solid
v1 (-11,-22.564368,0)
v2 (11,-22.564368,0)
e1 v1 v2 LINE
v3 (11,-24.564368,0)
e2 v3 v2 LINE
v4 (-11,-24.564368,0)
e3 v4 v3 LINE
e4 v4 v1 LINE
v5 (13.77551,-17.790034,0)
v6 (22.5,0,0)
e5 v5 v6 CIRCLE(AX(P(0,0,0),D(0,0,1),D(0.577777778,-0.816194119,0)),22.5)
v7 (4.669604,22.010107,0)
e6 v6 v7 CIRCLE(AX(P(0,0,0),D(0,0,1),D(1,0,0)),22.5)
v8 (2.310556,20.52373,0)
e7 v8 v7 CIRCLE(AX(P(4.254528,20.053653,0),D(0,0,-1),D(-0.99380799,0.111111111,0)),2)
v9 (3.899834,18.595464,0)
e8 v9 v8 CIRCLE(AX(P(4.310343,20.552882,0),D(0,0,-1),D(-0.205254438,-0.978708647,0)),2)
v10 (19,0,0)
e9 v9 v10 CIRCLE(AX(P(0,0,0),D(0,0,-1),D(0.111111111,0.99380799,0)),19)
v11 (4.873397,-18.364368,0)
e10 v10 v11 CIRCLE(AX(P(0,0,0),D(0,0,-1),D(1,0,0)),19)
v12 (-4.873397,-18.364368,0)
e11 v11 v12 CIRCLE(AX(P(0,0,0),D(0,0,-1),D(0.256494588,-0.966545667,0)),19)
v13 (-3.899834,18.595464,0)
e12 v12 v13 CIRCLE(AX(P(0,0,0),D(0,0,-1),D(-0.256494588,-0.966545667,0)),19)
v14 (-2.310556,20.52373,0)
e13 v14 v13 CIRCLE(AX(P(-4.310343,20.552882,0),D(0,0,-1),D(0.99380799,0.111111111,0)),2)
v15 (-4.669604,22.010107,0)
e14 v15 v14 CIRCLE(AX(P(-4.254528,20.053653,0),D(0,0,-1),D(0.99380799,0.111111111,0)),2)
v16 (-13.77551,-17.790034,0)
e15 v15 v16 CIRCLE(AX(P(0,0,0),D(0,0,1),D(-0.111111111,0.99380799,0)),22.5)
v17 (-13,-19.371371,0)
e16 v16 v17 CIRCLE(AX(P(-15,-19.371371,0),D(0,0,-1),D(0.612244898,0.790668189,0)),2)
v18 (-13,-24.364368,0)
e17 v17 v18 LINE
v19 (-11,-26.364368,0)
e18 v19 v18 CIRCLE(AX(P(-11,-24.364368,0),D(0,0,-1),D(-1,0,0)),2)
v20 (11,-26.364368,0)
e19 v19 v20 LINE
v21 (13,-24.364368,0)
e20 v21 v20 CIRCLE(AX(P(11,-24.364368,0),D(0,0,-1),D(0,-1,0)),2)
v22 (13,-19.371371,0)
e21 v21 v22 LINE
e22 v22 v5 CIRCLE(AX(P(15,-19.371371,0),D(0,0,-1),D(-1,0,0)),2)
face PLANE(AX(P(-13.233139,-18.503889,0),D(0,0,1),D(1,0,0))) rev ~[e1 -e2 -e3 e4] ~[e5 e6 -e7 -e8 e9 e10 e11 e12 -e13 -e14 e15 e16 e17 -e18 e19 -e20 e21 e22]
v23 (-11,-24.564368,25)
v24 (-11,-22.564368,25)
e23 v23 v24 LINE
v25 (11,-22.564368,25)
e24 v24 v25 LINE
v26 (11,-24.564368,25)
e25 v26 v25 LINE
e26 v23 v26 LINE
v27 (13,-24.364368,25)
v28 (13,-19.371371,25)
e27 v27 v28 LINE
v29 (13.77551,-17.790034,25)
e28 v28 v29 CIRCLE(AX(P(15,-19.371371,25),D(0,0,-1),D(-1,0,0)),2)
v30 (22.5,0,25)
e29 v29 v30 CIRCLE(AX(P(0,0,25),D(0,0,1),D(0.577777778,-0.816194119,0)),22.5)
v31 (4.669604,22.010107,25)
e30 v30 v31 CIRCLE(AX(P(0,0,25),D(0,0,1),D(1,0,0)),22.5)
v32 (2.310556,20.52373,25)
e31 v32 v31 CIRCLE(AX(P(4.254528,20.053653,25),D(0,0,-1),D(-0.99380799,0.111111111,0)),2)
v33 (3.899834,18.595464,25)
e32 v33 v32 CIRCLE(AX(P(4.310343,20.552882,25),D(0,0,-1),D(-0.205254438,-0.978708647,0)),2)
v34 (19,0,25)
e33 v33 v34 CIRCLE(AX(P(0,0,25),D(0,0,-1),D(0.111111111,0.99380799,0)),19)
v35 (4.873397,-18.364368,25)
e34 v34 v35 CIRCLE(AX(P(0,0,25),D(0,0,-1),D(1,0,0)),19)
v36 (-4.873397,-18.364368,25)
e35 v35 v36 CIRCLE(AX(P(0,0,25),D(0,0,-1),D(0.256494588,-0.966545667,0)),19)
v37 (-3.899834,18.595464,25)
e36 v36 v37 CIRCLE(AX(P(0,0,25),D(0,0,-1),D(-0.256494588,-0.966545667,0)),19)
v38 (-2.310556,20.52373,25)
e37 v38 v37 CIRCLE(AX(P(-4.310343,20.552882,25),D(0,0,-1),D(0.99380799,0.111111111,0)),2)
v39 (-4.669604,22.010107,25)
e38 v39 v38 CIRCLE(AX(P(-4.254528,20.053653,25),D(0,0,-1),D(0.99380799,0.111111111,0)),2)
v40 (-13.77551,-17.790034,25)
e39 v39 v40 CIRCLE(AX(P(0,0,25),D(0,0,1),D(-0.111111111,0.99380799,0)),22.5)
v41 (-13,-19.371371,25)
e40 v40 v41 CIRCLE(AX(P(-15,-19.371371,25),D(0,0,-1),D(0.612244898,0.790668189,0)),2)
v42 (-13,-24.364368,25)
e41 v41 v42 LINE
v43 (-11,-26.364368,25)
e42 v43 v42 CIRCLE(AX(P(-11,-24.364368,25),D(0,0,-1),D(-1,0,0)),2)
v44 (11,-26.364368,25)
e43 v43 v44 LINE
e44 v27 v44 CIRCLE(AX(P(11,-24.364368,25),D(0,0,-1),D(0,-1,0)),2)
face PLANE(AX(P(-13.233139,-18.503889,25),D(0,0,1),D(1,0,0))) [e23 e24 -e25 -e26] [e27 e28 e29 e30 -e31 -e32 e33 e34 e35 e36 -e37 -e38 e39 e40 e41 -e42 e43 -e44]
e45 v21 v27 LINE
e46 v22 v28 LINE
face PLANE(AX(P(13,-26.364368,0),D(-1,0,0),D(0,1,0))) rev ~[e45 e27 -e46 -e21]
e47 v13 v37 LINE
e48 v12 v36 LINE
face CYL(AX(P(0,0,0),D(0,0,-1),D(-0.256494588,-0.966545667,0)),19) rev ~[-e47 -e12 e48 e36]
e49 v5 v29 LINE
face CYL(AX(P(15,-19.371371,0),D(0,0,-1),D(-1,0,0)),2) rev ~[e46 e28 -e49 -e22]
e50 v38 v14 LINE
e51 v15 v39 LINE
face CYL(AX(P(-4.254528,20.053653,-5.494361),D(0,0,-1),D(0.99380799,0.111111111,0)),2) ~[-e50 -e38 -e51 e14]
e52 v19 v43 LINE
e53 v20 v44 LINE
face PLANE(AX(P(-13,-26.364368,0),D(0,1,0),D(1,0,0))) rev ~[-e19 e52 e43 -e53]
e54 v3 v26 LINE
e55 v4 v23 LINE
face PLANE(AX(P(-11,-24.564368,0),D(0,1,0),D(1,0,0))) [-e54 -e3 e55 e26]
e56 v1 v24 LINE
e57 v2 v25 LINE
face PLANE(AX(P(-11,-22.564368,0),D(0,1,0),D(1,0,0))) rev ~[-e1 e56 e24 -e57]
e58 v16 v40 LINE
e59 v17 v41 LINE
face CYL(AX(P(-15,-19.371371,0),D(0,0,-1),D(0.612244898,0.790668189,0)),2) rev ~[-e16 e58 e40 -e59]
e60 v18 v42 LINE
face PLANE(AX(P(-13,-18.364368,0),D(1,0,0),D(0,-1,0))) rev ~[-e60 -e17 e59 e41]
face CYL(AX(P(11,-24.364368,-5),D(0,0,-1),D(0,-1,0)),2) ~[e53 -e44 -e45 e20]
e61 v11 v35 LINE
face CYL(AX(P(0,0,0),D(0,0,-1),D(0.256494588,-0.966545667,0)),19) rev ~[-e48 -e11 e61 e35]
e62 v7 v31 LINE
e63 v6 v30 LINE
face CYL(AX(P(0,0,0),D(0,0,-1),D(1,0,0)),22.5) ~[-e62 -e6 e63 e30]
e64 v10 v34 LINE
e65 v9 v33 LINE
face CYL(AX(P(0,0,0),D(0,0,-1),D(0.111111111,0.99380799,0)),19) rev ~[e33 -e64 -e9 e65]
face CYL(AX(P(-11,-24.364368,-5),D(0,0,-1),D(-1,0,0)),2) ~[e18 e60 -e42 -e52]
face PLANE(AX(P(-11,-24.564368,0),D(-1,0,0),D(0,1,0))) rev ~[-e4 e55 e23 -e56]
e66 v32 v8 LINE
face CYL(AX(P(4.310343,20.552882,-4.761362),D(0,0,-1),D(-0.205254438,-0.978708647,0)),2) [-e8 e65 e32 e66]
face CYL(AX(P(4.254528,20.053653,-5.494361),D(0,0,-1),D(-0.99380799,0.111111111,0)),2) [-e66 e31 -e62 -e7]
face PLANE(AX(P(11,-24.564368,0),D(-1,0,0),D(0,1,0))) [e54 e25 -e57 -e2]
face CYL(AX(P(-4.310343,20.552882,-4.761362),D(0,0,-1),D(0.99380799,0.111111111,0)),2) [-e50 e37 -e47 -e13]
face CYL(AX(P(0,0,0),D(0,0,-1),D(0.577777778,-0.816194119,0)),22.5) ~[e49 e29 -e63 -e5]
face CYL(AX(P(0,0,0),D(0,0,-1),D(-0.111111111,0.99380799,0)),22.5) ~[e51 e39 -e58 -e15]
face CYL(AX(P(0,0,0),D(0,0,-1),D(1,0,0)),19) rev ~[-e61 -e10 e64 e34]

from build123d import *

# Parameters (mm, degrees)
F0_W        = 22
F0_H        = 2
F1_DEPTH    = 25
F2_T1_DEPTH = 25
F2_T3_DEPTH = 35.98872287
F2_T5_DEPTH = 34.5227248018
F2_T7_DEPTH = 35


# Not quite as in the source:
# - a fillet or chamfer that OpenCascade refuses, or shapes differently, is made with other operations: its cross-section is extruded or revolved along the edge and cut away or added


with BuildPart() as f1:
    # F0 (on Top) → F1 (new body)
    with BuildSketch(Plane.XY):
        with BuildLine():
            ThreePointArc((-4.8733971724, -18.3643676722), (-18.9479647202, 1.4052163402), (-2.1111111111, 18.88235181))
            Line((-2.1111111111, 18.88235181), (-2.5, 22.360679775))
            ThreePointArc((-2.5, 22.360679775), (-21.7874934858, 5.6173950908), (-13, -18.3643676722))
            Line((-13, -18.3643676722), (-4.8733971724, -18.3643676722))
        make_face()
        with BuildLine():
            ThreePointArc((2.1111111111, 18.88235181), (14.1617638575, 12.6666666667), (19, 0))
            ThreePointArc((19, 0), (15.0597899434, -11.5845900602), (4.8733971724, -18.3643676722))
            Line((4.8733971724, -18.3643676722), (13, -18.3643676722))
            ThreePointArc((13, -18.3643676722), (19.9843688917, -10.3380365641), (22.5, 0))
            ThreePointArc((22.5, 0), (16.7705098312, 15), (2.5, 22.360679775))
            Line((2.5, 22.360679775), (2.1111111111, 18.88235181))
        make_face()
        with BuildLine():
            Line((13, -18.3643676722), (4.8733971724, -18.3643676722))
            ThreePointArc((4.8733971724, -18.3643676722), (0, -19), (-4.8733971724, -18.3643676722))
            Line((-4.8733971724, -18.3643676722), (-13, -18.3643676722))
            ThreePointArc((-13, -18.3643676722), (0, -22.5), (13, -18.3643676722))
        make_face()
        with BuildLine():
            Line((13, -26.3643676722), (13, -18.3643676722))
            ThreePointArc((13, -18.3643676722), (0, -22.5), (-13, -18.3643676722))
            Line((-13, -18.3643676722), (-13, -26.3643676722))
            Line((-13, -26.3643676722), (13, -26.3643676722))
        make_face()
        with Locations((0, -23.5643676722)):
            Rectangle(F0_W, F0_H, mode=Mode.SUBTRACT)
    extrude(amount=F1_DEPTH)

    # F2: fillet of radius 2 on 8 edges, made by hand

    # F2_s2 → F2_t1 (join)
    with BuildSketch(Plane.XY):
        with BuildLine():
            ThreePointArc((-13.7755102041, -17.79003425), (-13.2043135586, -18.490740056), (-13, -19.3713706278))
            Line((-13, -19.3713706278), (-13, -18.3643676722))
            ThreePointArc((-13, -18.3643676722), (-13.390834604, -18.0813591471), (-13.7755102041, -17.79003425))
        make_face()
        with BuildLine():
            ThreePointArc((13, -19.3713706278), (13.2043135586, -18.490740056), (13.7755102041, -17.79003425))
            ThreePointArc((13.7755102041, -17.79003425), (13.390834604, -18.0813591471), (13, -18.3643676722))
            Line((13, -18.3643676722), (13, -19.3713706278))
        make_face()
    extrude(amount=F2_T1_DEPTH)

    # F2_s4 → F2_t3 (cut)
    with BuildSketch(Plane.XY.offset(-5.494361435)):
        with BuildLine():
            ThreePointArc((-2.2669117515, 20.275875101), (-3.0840105352, 21.6753462818), (-4.6696036077, 22.0101068182))
            ThreePointArc((-4.6696036077, 22.0101068182), (-3.5890847472, 22.2118993037), (-2.5, 22.360679775))
            Line((-2.5, 22.360679775), (-2.2669117515, 20.275875101))
        make_face()
        with BuildLine():
            ThreePointArc((2.2669117515, 20.275875101), (3.0840105352, 21.6753462818), (4.6696036077, 22.0101068182))
            ThreePointArc((4.6696036077, 22.0101068182), (3.5890847472, 22.2118993037), (2.5, 22.360679775))
            Line((2.5, 22.360679775), (2.2669117515, 20.275875101))
        make_face()
    extrude(amount=F2_T3_DEPTH, mode=Mode.SUBTRACT)

    # F2_s6 → F2_t5 (cut)
    with BuildSketch(Plane.XY.offset(-4.7613624009)):
        with BuildLine():
            ThreePointArc((-2.3227272178, 20.7751038089), (-2.6900167457, 19.3804728744), (-3.8998343218, 18.5954642927))
            ThreePointArc((-3.8998343218, 18.5954642927), (-3.0088938767, 18.7602387415), (-2.1111111111, 18.88235181))
            Line((-2.1111111111, 18.88235181), (-2.3227272178, 20.7751038089))
        make_face()
        with BuildLine():
            ThreePointArc((3.8998343218, 18.5954642927), (2.6900167457, 19.3804728744), (2.3227272178, 20.7751038089))
            Line((2.3227272178, 20.7751038089), (2.1111111111, 18.88235181))
            ThreePointArc((2.1111111111, 18.88235181), (3.0088938767, 18.7602387415), (3.8998343218, 18.5954642927))
        make_face()
    extrude(amount=F2_T5_DEPTH, mode=Mode.SUBTRACT)

    # F2_s8 → F2_t7 (cut)
    with BuildSketch(Plane.XY.offset(-5)):
        with BuildLine():
            ThreePointArc((11, -26.3643676722), (12.4142135624, -25.7785812346), (13, -24.3643676722))
            Line((13, -24.3643676722), (13, -26.3643676722))
            Line((13, -26.3643676722), (11, -26.3643676722))
        make_face()
        with BuildLine():
            ThreePointArc((-13, -24.3643676722), (-12.4142135624, -25.7785812346), (-11, -26.3643676722))
            Line((-11, -26.3643676722), (-13, -26.3643676722))
            Line((-13, -26.3643676722), (-13, -24.3643676722))
        make_face()
    extrude(amount=F2_T7_DEPTH, mode=Mode.SUBTRACT)


solid = f1.part
